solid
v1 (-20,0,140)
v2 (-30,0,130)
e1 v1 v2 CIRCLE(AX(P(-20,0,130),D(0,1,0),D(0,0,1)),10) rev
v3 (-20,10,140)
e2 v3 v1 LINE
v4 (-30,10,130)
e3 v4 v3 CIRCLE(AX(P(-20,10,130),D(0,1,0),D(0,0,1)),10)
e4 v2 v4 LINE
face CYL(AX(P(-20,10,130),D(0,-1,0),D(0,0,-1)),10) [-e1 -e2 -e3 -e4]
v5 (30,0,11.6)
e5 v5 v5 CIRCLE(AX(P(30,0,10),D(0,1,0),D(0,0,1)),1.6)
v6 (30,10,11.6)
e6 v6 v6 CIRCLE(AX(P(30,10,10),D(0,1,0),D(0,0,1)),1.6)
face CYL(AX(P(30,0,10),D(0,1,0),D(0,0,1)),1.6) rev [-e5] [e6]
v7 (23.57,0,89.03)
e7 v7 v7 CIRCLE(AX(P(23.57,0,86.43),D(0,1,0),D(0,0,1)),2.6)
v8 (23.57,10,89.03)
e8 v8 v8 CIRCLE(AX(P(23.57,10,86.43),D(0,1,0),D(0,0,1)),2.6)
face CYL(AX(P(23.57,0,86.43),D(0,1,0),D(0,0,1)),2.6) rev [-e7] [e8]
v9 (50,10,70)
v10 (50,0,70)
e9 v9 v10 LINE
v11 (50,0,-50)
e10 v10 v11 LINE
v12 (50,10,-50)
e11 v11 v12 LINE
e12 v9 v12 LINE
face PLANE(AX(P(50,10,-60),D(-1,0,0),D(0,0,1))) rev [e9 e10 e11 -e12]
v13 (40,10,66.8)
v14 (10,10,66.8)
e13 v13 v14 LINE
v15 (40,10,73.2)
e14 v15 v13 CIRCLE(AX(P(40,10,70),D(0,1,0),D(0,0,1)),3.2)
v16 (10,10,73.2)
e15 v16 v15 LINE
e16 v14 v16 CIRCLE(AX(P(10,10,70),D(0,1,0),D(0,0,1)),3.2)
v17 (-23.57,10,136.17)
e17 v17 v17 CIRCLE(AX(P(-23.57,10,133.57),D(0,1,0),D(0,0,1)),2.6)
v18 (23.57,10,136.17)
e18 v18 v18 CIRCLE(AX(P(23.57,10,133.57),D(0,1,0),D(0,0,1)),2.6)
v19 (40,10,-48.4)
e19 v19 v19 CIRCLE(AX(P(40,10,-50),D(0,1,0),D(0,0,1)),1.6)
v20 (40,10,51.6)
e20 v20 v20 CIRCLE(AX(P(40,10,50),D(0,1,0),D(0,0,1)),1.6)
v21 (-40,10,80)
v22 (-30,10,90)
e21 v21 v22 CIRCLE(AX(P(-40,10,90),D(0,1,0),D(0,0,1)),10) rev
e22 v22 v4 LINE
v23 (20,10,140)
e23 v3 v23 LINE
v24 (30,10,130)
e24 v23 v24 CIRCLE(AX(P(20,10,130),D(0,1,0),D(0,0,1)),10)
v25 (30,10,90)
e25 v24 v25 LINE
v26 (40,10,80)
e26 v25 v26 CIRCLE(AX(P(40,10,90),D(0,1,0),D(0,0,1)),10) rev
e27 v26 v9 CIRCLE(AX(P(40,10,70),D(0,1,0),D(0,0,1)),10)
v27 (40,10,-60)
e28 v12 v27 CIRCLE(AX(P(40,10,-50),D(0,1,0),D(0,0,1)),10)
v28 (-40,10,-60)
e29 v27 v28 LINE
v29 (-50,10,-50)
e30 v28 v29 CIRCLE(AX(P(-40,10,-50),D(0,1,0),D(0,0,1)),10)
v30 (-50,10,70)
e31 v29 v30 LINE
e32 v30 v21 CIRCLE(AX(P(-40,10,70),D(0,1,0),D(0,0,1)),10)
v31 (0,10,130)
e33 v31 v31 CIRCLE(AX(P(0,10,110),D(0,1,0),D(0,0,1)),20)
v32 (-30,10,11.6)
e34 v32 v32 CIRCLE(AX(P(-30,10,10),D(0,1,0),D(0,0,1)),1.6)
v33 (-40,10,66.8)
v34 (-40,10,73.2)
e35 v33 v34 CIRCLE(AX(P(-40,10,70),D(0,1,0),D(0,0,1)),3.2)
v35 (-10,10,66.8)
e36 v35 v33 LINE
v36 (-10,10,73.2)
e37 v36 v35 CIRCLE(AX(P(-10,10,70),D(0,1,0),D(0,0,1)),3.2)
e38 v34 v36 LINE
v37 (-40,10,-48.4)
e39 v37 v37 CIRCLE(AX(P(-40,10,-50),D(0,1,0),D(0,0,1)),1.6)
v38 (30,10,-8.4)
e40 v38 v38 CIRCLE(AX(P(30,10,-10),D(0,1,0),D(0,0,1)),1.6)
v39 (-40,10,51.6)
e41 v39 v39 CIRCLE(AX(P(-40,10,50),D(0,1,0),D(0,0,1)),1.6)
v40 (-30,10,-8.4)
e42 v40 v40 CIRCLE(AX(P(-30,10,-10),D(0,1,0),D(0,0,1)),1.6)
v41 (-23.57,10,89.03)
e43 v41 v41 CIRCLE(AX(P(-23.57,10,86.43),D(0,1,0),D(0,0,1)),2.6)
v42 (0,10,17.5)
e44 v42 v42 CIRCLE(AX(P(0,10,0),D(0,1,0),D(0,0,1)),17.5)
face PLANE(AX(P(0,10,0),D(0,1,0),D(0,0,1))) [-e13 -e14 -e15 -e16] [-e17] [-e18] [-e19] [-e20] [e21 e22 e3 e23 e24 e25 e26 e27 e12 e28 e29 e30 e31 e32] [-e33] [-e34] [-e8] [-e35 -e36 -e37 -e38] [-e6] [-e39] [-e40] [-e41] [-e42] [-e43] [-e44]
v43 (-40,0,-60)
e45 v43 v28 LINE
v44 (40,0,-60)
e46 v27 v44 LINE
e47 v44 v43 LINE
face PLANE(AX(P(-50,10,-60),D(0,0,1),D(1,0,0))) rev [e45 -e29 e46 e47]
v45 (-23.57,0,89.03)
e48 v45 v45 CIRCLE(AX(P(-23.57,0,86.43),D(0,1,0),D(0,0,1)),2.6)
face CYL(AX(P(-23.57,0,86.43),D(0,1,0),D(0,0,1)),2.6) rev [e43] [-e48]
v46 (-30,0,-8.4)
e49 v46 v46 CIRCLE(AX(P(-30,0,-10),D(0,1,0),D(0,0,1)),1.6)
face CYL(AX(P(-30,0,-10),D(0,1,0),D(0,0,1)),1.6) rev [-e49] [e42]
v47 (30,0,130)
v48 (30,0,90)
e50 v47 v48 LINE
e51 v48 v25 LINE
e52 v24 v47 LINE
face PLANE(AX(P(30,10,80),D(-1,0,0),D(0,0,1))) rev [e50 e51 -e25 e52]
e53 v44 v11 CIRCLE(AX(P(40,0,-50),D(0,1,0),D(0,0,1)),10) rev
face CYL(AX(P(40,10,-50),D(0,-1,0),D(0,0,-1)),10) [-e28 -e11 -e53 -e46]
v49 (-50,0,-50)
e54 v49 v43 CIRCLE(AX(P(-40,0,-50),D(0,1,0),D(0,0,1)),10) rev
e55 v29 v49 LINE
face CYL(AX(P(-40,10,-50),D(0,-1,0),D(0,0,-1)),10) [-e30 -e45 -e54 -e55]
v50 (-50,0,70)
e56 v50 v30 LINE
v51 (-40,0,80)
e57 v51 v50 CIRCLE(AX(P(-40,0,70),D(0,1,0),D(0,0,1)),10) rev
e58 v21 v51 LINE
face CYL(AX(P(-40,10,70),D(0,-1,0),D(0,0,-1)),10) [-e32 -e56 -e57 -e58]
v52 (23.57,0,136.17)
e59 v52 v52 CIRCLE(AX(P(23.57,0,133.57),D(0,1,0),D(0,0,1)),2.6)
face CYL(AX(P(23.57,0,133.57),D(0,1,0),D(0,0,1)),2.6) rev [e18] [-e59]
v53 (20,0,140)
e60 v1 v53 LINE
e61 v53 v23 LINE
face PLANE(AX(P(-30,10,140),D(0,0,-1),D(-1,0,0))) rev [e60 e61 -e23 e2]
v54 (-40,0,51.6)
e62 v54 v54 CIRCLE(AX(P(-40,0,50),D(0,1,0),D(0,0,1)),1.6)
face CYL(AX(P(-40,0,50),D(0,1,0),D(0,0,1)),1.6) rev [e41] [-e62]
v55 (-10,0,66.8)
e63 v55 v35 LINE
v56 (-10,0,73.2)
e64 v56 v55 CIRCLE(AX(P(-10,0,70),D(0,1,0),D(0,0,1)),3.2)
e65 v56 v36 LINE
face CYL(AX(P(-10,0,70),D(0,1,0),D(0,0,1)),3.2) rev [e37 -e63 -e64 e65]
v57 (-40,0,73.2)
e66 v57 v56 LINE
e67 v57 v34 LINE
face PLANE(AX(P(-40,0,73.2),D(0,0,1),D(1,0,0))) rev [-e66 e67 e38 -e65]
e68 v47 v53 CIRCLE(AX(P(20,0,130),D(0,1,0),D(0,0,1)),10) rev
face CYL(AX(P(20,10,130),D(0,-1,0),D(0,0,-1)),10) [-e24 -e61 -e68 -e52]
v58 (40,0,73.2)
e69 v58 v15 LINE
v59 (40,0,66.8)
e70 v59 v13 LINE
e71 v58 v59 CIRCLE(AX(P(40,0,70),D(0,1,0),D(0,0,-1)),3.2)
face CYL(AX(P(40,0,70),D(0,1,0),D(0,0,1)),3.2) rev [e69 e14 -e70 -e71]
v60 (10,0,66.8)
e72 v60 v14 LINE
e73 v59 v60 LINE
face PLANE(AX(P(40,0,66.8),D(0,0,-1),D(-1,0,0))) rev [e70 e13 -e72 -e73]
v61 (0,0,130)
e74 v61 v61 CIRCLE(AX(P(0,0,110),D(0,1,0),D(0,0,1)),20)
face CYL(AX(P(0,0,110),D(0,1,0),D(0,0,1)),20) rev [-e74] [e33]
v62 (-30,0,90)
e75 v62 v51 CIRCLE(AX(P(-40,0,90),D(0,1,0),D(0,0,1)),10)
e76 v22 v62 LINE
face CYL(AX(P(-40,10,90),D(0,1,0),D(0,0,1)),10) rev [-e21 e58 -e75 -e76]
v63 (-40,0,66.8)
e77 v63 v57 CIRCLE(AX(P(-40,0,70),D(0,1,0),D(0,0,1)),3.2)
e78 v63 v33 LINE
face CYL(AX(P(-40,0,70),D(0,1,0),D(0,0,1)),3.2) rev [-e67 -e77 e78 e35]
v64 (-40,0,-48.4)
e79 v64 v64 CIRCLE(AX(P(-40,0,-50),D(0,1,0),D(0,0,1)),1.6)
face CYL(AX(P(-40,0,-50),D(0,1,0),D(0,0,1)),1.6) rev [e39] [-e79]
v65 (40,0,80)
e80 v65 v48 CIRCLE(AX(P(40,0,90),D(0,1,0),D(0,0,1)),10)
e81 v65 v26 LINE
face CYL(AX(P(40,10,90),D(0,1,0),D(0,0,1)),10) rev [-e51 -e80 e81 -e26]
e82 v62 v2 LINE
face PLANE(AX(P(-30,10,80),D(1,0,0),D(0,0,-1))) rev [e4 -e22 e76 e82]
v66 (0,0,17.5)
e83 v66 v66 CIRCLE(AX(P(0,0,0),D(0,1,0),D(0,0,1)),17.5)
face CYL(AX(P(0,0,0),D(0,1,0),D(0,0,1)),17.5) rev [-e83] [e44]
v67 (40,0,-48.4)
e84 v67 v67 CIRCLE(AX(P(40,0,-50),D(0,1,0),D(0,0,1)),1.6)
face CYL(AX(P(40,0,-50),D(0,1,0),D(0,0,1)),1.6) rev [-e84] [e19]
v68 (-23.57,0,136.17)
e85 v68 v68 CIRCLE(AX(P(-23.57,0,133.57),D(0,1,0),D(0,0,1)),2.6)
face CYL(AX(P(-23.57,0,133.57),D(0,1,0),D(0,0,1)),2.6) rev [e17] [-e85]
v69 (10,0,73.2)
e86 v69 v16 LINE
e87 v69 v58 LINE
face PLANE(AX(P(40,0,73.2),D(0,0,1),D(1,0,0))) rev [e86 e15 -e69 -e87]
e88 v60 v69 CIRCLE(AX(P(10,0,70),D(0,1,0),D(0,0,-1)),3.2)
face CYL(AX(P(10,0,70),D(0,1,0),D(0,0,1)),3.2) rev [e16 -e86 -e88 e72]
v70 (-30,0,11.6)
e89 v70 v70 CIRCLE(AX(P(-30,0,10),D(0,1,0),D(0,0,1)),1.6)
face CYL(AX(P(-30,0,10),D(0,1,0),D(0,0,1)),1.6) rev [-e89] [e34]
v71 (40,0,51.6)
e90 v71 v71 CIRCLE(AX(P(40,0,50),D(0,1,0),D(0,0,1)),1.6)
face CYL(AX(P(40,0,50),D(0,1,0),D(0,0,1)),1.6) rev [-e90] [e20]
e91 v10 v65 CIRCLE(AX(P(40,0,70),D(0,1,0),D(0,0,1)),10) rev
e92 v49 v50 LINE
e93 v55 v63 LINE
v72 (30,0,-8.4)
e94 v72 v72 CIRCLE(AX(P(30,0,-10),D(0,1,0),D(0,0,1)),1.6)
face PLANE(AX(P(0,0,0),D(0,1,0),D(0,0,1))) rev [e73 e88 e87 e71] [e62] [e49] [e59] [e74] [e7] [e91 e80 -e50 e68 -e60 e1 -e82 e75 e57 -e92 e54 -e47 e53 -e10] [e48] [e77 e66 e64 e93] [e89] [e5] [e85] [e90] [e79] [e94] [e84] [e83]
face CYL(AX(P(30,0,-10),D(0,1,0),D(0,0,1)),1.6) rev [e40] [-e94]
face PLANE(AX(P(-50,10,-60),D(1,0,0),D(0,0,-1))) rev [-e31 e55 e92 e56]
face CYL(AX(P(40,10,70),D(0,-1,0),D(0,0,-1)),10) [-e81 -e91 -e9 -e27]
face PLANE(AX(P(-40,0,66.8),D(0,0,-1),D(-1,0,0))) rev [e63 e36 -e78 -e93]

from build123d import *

# Parameters (mm, degrees)
BOSS_EXTRUDE1_DEPTH     = 10
CUT_EXTRUDE1_DEPTH      = 149.996644258
CUT_EXTRUDE1_DEPTH_BACK = 149.996644258
SKETCH2_R               = 17.5
SKETCH2_R_2             = 1.6
CUT_EXTRUDE2_DEPTH      = 149.996644258
CUT_EXTRUDE2_DEPTH_BACK = 149.996644258
SKETCH3_R               = 20
SKETCH3_R_2             = 2.6
CUT_EXTRUDE3_DEPTH      = 149.996644258
CUT_EXTRUDE3_DEPTH_BACK = 149.996644258
SKETCH4_R               = 1.6
FILLET1_R               = 10


with BuildPart() as part:
    # Sketch1 → Boss-Extrude1 (new body)
    with BuildSketch(Plane(origin=(0, 0, 0), x_dir=(1, 0, 0), z_dir=(0, 1, 0))):
        Polygon((-50, 60), (50, 60), (50, -80), (30, -80), (30, -140), (-30, -140), (-30, -80), (-50, -80), align=None)
    extrude(amount=BOSS_EXTRUDE1_DEPTH)

    # Sketch2 → Cut-Extrude1 (cut, two sides: drawn at the far end of the back side and taken through both)
    with BuildSketch(Plane(origin=(0, 10, 0), x_dir=(1, 0, 0), z_dir=(0, 1, 0)).offset(-CUT_EXTRUDE1_DEPTH_BACK)):
        with Locations(Location((0, 0, 0), (0, 0, 270))):
            Circle(SKETCH2_R)
        with Locations(Location((-40, -50, 0), (0, 0, 270))):
            Circle(SKETCH2_R_2)
        with Locations(Location((40, -50, 0), (0, 0, 270))):
            Circle(SKETCH2_R_2)
        with Locations(Location((40, 50, 0), (0, 0, 270))):
            Circle(SKETCH2_R_2)
        with Locations(Location((-40, 50, 0), (0, 0, 270))):
            Circle(SKETCH2_R_2)
        with Locations((-40, -130)):
            Circle(SKETCH2_R_2)
        with Locations((40, -130)):
            Circle(SKETCH2_R_2)
        with Locations((-40, -100)):
            Circle(SKETCH2_R_2)
        with Locations((40, -100)):
            Circle(SKETCH2_R_2)
    extrude(amount=CUT_EXTRUDE1_DEPTH + CUT_EXTRUDE1_DEPTH_BACK, mode=Mode.SUBTRACT)

    # Sketch3 → Cut-Extrude2 (cut, two sides: drawn at the far end of the back side and taken through both)
    with BuildSketch(Plane(origin=(0, 10, 0), x_dir=(1, 0, 0), z_dir=(0, 1, 0)).offset(-CUT_EXTRUDE2_DEPTH_BACK)):
        with Locations(Location((0, -110, 0), (0, 0, 270))):
            Circle(SKETCH3_R)
        with Locations(Location((-23.57, -86.43, 0), (0, 0, 270))):
            Circle(SKETCH3_R_2)
        with Locations(Location((23.57, -86.43, 0), (0, 0, 270))):
            Circle(SKETCH3_R_2)
        with Locations(Location((23.57, -133.57, 0), (0, 0, 270))):
            Circle(SKETCH3_R_2)
        with Locations(Location((-23.57, -133.57, 0), (0, 0, 270))):
            Circle(SKETCH3_R_2)
        with BuildLine():
            Line((-40, -66.8), (-10, -66.8))
            ThreePointArc((-10, -66.8), (-6.8, -70), (-10, -73.2))
            Line((-10, -73.2), (-40, -73.2))
            ThreePointArc((-40, -73.2), (-43.2, -70), (-40, -66.8))
        make_face()
        with BuildLine():
            Line((40, -66.8), (10, -66.8))
            ThreePointArc((10, -66.8), (6.8, -70), (10, -73.2))
            Line((10, -73.2), (40, -73.2))
            ThreePointArc((40, -73.2), (43.2, -70), (40, -66.8))
        make_face()
    extrude(amount=CUT_EXTRUDE2_DEPTH + CUT_EXTRUDE2_DEPTH_BACK, mode=Mode.SUBTRACT)

    # Sketch4 → Cut-Extrude3 (cut, two sides: drawn at the far end of the back side and taken through both)
    with BuildSketch(Plane(origin=(0, 10, 0), x_dir=(1, 0, 0), z_dir=(0, 1, 0)).offset(-CUT_EXTRUDE3_DEPTH_BACK)):
        with Locations(Location((-30, 10, 0), (0, 0, 270))):
            Circle(SKETCH4_R)
        with Locations(Location((-30, -10, 0), (0, 0, 270))):
            Circle(SKETCH4_R)
        with Locations(Location((30, 10, 0), (0, 0, 270))):
            Circle(SKETCH4_R)
        with Locations(Location((30, -10, 0), (0, 0, 270))):
            Circle(SKETCH4_R)
    extrude(amount=CUT_EXTRUDE3_DEPTH + CUT_EXTRUDE3_DEPTH_BACK, mode=Mode.SUBTRACT)

    # Fillet1
    fillet1_edges = [part.edges().sort_by_distance(p)[0] for p in [
        (50, 5, -60),
        (-50, 5, -60),
        (-30, 5, 80),
        (-30, 5, 140),
        (30, 5, 140),
        (30, 5, 80),
        (50, 5, 80),
        (-50, 5, 80),
    ]]
    fillet(fillet1_edges, radius=FILLET1_R - 0.0001)  # a hair under: the kernel refuses the full size


solid = part.part
